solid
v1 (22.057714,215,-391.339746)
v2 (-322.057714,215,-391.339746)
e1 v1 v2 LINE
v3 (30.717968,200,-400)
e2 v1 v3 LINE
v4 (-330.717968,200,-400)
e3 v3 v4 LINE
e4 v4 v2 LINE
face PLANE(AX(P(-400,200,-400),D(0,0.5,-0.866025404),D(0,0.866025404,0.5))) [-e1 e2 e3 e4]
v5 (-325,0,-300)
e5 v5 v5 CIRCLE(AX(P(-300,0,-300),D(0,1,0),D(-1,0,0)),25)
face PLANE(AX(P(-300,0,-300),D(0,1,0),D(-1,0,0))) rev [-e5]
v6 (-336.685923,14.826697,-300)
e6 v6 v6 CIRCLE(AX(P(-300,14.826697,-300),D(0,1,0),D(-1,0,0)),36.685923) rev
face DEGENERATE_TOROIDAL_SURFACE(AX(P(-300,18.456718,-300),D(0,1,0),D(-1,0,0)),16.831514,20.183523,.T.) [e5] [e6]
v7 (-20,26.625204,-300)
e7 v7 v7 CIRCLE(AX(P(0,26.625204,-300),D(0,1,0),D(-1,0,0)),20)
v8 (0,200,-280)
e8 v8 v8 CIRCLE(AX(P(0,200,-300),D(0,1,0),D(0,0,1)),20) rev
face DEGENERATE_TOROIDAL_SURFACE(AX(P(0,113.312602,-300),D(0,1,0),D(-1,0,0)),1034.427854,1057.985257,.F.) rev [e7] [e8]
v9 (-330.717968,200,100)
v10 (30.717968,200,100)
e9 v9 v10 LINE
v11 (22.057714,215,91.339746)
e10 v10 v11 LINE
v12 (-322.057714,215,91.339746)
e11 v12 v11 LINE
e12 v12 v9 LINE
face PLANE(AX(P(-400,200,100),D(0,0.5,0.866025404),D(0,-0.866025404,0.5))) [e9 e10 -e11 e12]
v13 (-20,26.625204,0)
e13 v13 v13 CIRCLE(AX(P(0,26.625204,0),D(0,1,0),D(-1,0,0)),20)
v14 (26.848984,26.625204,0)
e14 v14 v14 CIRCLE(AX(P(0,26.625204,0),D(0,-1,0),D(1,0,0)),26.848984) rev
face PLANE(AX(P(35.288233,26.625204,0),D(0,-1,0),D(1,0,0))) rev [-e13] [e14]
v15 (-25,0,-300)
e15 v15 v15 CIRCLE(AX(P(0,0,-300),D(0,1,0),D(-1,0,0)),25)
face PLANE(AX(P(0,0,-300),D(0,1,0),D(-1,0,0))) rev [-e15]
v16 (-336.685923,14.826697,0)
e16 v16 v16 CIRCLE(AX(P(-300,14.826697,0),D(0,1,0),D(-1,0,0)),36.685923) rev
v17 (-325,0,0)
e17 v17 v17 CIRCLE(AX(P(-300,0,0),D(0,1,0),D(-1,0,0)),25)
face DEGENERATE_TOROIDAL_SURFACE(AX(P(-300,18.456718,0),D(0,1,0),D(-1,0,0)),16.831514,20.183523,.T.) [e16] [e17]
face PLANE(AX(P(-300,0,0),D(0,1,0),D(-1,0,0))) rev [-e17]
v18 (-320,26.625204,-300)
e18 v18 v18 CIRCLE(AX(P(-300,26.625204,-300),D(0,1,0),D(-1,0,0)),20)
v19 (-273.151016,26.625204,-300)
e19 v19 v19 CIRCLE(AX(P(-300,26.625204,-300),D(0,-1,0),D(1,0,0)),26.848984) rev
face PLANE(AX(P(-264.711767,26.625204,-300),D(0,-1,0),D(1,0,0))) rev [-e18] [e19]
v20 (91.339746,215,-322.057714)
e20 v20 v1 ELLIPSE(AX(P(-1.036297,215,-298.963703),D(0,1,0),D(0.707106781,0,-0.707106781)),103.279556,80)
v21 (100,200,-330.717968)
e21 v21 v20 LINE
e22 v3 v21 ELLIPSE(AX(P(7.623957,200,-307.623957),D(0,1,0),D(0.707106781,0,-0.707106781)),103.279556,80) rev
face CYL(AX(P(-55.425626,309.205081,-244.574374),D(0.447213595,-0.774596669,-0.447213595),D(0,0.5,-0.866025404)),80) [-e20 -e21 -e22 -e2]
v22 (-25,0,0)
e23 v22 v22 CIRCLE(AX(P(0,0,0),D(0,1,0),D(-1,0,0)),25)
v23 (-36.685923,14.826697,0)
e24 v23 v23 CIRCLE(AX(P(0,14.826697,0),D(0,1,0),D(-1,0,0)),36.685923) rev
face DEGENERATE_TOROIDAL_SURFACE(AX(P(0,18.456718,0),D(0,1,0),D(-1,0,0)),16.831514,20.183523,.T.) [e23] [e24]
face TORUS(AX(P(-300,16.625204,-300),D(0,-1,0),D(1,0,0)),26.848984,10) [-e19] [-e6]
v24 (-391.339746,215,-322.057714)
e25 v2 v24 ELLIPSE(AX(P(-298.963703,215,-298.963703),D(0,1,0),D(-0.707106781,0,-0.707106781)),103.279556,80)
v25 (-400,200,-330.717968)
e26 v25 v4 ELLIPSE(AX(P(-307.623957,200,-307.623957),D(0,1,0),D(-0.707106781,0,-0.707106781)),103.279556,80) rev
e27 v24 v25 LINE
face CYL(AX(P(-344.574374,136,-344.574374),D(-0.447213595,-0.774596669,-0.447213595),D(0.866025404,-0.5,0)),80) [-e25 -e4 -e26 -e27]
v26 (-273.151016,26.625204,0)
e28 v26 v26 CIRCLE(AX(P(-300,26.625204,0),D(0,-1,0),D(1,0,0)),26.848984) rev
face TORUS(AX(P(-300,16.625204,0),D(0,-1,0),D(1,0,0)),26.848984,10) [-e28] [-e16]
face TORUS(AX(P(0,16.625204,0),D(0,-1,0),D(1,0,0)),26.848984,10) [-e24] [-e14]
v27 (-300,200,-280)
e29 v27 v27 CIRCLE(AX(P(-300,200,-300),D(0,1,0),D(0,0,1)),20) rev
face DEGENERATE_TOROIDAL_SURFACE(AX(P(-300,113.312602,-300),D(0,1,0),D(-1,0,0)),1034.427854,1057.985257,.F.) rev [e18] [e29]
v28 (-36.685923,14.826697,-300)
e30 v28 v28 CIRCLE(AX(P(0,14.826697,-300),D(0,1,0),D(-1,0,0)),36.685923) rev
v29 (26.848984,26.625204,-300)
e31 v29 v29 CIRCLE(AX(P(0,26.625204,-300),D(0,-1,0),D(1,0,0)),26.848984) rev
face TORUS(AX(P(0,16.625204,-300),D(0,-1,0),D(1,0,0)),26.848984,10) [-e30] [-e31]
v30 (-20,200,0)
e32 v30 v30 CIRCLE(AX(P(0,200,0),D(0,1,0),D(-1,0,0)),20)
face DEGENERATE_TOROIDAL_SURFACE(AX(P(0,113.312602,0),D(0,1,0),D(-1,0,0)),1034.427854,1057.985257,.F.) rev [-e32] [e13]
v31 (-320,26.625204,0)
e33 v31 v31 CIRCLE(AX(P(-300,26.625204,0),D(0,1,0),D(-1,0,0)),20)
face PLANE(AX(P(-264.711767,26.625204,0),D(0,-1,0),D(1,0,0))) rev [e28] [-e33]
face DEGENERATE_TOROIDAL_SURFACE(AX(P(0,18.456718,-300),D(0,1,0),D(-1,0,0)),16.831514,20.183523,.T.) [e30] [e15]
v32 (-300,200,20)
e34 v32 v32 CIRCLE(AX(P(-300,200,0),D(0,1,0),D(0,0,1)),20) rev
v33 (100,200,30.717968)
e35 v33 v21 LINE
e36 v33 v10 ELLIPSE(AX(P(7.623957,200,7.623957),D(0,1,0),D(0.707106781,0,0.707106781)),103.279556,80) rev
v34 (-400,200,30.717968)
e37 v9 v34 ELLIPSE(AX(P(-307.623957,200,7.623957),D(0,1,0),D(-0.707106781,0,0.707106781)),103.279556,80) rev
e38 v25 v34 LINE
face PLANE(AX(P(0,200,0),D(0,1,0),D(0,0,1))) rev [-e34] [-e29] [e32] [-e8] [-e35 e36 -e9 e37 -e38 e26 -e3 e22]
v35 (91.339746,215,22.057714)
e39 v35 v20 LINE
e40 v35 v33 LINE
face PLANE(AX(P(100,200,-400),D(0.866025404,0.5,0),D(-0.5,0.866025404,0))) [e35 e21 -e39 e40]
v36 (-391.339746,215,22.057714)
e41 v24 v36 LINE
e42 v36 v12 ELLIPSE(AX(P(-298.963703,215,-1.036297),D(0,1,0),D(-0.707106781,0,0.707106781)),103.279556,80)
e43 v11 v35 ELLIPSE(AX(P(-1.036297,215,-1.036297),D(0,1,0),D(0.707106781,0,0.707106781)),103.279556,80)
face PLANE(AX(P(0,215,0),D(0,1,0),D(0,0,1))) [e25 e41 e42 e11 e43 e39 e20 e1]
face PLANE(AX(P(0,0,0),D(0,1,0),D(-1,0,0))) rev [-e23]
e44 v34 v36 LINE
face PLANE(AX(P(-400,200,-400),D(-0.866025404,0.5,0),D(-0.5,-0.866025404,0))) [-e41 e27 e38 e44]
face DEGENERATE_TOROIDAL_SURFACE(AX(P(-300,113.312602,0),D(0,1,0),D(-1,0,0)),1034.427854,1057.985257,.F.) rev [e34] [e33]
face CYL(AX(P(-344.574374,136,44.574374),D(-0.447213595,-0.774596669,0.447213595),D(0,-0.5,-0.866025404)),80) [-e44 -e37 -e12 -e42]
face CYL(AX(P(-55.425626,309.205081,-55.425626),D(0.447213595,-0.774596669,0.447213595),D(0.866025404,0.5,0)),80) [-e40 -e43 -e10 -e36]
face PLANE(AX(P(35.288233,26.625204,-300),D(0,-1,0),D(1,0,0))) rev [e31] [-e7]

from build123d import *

# Parameters (mm, degrees)
FILLET1_R           = 10
LPATTERN2_COUNT     = 2
LPATTERN2_PITCH     = 300
LPATTERN3_COUNT     = 2
LPATTERN3_PITCH     = 300
SKETCH2_W           = 500
SKETCH2_H           = 500
BOSS_EXTRUDE1_DEPTH = 15
BOSS_EXTRUDE1_TAPER = 30
FILLET2_R           = 80


with BuildPart() as part:
    # Sketch1 → Revolve1 (revolve)
    with BuildSketch(Plane.XY, mode=Mode.PRIVATE) as revolve1_sk:
        with BuildLine():
            Line((0, 200), (0, 0))
            Line((0, 0), (25, 0))
            ThreePointArc((25, 0), (35.658376663, 11.181839274), (35.288232701, 26.625204065))
            Line((35.288232701, 26.625204065), (20, 26.625204065))
            ThreePointArc((20, 26.625204065), (23.557403108, 113.312602033), (20, 200))
            Line((20, 200), (0, 200))
        make_face()
    revolve(revolve1_sk.sketch.rotate(Axis((0, 200, 0), (0, -1, 0)), 180), axis=Axis((0, 200, 0), (0, -1, 0)))

    # Fillet1
    fillet1_edges = [part.edges().sort_by_distance(p)[0] for p in [
        (35.288232701, 26.625204065, 0),
    ]]
    fillet(fillet1_edges, radius=FILLET1_R)


with BuildPart() as lpattern2_1:
    # LPattern2: pattern copy
    add(part.part.moved(Location(Vector(0, 0, -1) * (1 * LPATTERN2_PITCH))))


with BuildPart() as lpattern3_1:
    # LPattern3: pattern copy
    add(lpattern2_1.part.moved(Location(Vector(-1, 0, 0) * (1 * LPATTERN3_PITCH))))


with BuildPart() as lpattern3_2:
    # LPattern3: pattern copy
    add(part.part.moved(Location(Vector(-1, 0, 0) * (1 * LPATTERN3_PITCH))))


with BuildPart() as part_1:
    add(part.part)

    add(lpattern2_1.part)  # Boss-Extrude1 merges LPattern2_1

    add(lpattern3_1.part)  # Boss-Extrude1 merges LPattern3_1

    add(lpattern3_2.part)  # Boss-Extrude1 merges LPattern3_2
    # Sketch2 → Boss-Extrude1 (add)
    with BuildSketch(Plane(origin=(0, 200, 0), x_dir=(1, 0, 0), z_dir=(0, 1, 0))):
        with Locations((-150, 150)):
            Rectangle(SKETCH2_W, SKETCH2_H)
    extrude(amount=BOSS_EXTRUDE1_DEPTH, taper=BOSS_EXTRUDE1_TAPER)

    # Fillet2
    # the kernel refuses this fillet: 80 mm, written as the material it takes off along each edge
    with BuildSketch(Plane(origin=(-469.282032303, 80, -469.282032303), x_dir=(-0.22360679774997919, -0.3872983346207402, 0.8944271909999165), z_dir=(0.44721359549995965, 0.774596669241483, 0.4472135954999567)), Plane(origin=(169.282032303, 80, -469.282032303), x_dir=(-0.8944271909999159, -0.38729833462074126, -0.22360679774997977), z_dir=(-0.4472135954999579, 0.7745966692414825, 0.4472135954999594))) as fillet2_piece_1:
        with BuildLine():
            CenterArc((FILLET2_R * 0.774596669241, FILLET2_R), FILLET2_R, 194.477512186, 75.522487814)
            Line((-FILLET2_R * 0.19364916731, FILLET2_R * 0.75), (0, 0))
            Line((0, 0), (FILLET2_R * 0.774596669241, 0))
        make_face()
    extrude(amount=329.203584428, mode=Mode.SUBTRACT)
    with BuildSketch(Plane(origin=(-469.282032303, 80, 169.282032303), x_dir=(-0.22360679774998043, -0.38729833462074226, -0.8944271909999153), z_dir=(0.4472135954999591, 0.774596669241482, -0.4472135954999591)), Plane(origin=(169.282032303, 80, 169.282032303), x_dir=(-0.8944271909999149, -0.387298334620743, 0.22360679774998055), z_dir=(-0.4472135954999599, 0.774596669241482, -0.4472135954999584))) as fillet2_piece_2:
        with BuildLine():
            CenterArc((FILLET2_R * 0.774596669241, -FILLET2_R), FILLET2_R, 90, 75.522487814)
            Line((-FILLET2_R * 0.19364916731, -FILLET2_R * 0.75), (0, 0))
            Line((0, 0), (FILLET2_R * 0.774596669241, 0))
        make_face()
    extrude(amount=329.203584428, mode=Mode.SUBTRACT)


solid = part_1.part
